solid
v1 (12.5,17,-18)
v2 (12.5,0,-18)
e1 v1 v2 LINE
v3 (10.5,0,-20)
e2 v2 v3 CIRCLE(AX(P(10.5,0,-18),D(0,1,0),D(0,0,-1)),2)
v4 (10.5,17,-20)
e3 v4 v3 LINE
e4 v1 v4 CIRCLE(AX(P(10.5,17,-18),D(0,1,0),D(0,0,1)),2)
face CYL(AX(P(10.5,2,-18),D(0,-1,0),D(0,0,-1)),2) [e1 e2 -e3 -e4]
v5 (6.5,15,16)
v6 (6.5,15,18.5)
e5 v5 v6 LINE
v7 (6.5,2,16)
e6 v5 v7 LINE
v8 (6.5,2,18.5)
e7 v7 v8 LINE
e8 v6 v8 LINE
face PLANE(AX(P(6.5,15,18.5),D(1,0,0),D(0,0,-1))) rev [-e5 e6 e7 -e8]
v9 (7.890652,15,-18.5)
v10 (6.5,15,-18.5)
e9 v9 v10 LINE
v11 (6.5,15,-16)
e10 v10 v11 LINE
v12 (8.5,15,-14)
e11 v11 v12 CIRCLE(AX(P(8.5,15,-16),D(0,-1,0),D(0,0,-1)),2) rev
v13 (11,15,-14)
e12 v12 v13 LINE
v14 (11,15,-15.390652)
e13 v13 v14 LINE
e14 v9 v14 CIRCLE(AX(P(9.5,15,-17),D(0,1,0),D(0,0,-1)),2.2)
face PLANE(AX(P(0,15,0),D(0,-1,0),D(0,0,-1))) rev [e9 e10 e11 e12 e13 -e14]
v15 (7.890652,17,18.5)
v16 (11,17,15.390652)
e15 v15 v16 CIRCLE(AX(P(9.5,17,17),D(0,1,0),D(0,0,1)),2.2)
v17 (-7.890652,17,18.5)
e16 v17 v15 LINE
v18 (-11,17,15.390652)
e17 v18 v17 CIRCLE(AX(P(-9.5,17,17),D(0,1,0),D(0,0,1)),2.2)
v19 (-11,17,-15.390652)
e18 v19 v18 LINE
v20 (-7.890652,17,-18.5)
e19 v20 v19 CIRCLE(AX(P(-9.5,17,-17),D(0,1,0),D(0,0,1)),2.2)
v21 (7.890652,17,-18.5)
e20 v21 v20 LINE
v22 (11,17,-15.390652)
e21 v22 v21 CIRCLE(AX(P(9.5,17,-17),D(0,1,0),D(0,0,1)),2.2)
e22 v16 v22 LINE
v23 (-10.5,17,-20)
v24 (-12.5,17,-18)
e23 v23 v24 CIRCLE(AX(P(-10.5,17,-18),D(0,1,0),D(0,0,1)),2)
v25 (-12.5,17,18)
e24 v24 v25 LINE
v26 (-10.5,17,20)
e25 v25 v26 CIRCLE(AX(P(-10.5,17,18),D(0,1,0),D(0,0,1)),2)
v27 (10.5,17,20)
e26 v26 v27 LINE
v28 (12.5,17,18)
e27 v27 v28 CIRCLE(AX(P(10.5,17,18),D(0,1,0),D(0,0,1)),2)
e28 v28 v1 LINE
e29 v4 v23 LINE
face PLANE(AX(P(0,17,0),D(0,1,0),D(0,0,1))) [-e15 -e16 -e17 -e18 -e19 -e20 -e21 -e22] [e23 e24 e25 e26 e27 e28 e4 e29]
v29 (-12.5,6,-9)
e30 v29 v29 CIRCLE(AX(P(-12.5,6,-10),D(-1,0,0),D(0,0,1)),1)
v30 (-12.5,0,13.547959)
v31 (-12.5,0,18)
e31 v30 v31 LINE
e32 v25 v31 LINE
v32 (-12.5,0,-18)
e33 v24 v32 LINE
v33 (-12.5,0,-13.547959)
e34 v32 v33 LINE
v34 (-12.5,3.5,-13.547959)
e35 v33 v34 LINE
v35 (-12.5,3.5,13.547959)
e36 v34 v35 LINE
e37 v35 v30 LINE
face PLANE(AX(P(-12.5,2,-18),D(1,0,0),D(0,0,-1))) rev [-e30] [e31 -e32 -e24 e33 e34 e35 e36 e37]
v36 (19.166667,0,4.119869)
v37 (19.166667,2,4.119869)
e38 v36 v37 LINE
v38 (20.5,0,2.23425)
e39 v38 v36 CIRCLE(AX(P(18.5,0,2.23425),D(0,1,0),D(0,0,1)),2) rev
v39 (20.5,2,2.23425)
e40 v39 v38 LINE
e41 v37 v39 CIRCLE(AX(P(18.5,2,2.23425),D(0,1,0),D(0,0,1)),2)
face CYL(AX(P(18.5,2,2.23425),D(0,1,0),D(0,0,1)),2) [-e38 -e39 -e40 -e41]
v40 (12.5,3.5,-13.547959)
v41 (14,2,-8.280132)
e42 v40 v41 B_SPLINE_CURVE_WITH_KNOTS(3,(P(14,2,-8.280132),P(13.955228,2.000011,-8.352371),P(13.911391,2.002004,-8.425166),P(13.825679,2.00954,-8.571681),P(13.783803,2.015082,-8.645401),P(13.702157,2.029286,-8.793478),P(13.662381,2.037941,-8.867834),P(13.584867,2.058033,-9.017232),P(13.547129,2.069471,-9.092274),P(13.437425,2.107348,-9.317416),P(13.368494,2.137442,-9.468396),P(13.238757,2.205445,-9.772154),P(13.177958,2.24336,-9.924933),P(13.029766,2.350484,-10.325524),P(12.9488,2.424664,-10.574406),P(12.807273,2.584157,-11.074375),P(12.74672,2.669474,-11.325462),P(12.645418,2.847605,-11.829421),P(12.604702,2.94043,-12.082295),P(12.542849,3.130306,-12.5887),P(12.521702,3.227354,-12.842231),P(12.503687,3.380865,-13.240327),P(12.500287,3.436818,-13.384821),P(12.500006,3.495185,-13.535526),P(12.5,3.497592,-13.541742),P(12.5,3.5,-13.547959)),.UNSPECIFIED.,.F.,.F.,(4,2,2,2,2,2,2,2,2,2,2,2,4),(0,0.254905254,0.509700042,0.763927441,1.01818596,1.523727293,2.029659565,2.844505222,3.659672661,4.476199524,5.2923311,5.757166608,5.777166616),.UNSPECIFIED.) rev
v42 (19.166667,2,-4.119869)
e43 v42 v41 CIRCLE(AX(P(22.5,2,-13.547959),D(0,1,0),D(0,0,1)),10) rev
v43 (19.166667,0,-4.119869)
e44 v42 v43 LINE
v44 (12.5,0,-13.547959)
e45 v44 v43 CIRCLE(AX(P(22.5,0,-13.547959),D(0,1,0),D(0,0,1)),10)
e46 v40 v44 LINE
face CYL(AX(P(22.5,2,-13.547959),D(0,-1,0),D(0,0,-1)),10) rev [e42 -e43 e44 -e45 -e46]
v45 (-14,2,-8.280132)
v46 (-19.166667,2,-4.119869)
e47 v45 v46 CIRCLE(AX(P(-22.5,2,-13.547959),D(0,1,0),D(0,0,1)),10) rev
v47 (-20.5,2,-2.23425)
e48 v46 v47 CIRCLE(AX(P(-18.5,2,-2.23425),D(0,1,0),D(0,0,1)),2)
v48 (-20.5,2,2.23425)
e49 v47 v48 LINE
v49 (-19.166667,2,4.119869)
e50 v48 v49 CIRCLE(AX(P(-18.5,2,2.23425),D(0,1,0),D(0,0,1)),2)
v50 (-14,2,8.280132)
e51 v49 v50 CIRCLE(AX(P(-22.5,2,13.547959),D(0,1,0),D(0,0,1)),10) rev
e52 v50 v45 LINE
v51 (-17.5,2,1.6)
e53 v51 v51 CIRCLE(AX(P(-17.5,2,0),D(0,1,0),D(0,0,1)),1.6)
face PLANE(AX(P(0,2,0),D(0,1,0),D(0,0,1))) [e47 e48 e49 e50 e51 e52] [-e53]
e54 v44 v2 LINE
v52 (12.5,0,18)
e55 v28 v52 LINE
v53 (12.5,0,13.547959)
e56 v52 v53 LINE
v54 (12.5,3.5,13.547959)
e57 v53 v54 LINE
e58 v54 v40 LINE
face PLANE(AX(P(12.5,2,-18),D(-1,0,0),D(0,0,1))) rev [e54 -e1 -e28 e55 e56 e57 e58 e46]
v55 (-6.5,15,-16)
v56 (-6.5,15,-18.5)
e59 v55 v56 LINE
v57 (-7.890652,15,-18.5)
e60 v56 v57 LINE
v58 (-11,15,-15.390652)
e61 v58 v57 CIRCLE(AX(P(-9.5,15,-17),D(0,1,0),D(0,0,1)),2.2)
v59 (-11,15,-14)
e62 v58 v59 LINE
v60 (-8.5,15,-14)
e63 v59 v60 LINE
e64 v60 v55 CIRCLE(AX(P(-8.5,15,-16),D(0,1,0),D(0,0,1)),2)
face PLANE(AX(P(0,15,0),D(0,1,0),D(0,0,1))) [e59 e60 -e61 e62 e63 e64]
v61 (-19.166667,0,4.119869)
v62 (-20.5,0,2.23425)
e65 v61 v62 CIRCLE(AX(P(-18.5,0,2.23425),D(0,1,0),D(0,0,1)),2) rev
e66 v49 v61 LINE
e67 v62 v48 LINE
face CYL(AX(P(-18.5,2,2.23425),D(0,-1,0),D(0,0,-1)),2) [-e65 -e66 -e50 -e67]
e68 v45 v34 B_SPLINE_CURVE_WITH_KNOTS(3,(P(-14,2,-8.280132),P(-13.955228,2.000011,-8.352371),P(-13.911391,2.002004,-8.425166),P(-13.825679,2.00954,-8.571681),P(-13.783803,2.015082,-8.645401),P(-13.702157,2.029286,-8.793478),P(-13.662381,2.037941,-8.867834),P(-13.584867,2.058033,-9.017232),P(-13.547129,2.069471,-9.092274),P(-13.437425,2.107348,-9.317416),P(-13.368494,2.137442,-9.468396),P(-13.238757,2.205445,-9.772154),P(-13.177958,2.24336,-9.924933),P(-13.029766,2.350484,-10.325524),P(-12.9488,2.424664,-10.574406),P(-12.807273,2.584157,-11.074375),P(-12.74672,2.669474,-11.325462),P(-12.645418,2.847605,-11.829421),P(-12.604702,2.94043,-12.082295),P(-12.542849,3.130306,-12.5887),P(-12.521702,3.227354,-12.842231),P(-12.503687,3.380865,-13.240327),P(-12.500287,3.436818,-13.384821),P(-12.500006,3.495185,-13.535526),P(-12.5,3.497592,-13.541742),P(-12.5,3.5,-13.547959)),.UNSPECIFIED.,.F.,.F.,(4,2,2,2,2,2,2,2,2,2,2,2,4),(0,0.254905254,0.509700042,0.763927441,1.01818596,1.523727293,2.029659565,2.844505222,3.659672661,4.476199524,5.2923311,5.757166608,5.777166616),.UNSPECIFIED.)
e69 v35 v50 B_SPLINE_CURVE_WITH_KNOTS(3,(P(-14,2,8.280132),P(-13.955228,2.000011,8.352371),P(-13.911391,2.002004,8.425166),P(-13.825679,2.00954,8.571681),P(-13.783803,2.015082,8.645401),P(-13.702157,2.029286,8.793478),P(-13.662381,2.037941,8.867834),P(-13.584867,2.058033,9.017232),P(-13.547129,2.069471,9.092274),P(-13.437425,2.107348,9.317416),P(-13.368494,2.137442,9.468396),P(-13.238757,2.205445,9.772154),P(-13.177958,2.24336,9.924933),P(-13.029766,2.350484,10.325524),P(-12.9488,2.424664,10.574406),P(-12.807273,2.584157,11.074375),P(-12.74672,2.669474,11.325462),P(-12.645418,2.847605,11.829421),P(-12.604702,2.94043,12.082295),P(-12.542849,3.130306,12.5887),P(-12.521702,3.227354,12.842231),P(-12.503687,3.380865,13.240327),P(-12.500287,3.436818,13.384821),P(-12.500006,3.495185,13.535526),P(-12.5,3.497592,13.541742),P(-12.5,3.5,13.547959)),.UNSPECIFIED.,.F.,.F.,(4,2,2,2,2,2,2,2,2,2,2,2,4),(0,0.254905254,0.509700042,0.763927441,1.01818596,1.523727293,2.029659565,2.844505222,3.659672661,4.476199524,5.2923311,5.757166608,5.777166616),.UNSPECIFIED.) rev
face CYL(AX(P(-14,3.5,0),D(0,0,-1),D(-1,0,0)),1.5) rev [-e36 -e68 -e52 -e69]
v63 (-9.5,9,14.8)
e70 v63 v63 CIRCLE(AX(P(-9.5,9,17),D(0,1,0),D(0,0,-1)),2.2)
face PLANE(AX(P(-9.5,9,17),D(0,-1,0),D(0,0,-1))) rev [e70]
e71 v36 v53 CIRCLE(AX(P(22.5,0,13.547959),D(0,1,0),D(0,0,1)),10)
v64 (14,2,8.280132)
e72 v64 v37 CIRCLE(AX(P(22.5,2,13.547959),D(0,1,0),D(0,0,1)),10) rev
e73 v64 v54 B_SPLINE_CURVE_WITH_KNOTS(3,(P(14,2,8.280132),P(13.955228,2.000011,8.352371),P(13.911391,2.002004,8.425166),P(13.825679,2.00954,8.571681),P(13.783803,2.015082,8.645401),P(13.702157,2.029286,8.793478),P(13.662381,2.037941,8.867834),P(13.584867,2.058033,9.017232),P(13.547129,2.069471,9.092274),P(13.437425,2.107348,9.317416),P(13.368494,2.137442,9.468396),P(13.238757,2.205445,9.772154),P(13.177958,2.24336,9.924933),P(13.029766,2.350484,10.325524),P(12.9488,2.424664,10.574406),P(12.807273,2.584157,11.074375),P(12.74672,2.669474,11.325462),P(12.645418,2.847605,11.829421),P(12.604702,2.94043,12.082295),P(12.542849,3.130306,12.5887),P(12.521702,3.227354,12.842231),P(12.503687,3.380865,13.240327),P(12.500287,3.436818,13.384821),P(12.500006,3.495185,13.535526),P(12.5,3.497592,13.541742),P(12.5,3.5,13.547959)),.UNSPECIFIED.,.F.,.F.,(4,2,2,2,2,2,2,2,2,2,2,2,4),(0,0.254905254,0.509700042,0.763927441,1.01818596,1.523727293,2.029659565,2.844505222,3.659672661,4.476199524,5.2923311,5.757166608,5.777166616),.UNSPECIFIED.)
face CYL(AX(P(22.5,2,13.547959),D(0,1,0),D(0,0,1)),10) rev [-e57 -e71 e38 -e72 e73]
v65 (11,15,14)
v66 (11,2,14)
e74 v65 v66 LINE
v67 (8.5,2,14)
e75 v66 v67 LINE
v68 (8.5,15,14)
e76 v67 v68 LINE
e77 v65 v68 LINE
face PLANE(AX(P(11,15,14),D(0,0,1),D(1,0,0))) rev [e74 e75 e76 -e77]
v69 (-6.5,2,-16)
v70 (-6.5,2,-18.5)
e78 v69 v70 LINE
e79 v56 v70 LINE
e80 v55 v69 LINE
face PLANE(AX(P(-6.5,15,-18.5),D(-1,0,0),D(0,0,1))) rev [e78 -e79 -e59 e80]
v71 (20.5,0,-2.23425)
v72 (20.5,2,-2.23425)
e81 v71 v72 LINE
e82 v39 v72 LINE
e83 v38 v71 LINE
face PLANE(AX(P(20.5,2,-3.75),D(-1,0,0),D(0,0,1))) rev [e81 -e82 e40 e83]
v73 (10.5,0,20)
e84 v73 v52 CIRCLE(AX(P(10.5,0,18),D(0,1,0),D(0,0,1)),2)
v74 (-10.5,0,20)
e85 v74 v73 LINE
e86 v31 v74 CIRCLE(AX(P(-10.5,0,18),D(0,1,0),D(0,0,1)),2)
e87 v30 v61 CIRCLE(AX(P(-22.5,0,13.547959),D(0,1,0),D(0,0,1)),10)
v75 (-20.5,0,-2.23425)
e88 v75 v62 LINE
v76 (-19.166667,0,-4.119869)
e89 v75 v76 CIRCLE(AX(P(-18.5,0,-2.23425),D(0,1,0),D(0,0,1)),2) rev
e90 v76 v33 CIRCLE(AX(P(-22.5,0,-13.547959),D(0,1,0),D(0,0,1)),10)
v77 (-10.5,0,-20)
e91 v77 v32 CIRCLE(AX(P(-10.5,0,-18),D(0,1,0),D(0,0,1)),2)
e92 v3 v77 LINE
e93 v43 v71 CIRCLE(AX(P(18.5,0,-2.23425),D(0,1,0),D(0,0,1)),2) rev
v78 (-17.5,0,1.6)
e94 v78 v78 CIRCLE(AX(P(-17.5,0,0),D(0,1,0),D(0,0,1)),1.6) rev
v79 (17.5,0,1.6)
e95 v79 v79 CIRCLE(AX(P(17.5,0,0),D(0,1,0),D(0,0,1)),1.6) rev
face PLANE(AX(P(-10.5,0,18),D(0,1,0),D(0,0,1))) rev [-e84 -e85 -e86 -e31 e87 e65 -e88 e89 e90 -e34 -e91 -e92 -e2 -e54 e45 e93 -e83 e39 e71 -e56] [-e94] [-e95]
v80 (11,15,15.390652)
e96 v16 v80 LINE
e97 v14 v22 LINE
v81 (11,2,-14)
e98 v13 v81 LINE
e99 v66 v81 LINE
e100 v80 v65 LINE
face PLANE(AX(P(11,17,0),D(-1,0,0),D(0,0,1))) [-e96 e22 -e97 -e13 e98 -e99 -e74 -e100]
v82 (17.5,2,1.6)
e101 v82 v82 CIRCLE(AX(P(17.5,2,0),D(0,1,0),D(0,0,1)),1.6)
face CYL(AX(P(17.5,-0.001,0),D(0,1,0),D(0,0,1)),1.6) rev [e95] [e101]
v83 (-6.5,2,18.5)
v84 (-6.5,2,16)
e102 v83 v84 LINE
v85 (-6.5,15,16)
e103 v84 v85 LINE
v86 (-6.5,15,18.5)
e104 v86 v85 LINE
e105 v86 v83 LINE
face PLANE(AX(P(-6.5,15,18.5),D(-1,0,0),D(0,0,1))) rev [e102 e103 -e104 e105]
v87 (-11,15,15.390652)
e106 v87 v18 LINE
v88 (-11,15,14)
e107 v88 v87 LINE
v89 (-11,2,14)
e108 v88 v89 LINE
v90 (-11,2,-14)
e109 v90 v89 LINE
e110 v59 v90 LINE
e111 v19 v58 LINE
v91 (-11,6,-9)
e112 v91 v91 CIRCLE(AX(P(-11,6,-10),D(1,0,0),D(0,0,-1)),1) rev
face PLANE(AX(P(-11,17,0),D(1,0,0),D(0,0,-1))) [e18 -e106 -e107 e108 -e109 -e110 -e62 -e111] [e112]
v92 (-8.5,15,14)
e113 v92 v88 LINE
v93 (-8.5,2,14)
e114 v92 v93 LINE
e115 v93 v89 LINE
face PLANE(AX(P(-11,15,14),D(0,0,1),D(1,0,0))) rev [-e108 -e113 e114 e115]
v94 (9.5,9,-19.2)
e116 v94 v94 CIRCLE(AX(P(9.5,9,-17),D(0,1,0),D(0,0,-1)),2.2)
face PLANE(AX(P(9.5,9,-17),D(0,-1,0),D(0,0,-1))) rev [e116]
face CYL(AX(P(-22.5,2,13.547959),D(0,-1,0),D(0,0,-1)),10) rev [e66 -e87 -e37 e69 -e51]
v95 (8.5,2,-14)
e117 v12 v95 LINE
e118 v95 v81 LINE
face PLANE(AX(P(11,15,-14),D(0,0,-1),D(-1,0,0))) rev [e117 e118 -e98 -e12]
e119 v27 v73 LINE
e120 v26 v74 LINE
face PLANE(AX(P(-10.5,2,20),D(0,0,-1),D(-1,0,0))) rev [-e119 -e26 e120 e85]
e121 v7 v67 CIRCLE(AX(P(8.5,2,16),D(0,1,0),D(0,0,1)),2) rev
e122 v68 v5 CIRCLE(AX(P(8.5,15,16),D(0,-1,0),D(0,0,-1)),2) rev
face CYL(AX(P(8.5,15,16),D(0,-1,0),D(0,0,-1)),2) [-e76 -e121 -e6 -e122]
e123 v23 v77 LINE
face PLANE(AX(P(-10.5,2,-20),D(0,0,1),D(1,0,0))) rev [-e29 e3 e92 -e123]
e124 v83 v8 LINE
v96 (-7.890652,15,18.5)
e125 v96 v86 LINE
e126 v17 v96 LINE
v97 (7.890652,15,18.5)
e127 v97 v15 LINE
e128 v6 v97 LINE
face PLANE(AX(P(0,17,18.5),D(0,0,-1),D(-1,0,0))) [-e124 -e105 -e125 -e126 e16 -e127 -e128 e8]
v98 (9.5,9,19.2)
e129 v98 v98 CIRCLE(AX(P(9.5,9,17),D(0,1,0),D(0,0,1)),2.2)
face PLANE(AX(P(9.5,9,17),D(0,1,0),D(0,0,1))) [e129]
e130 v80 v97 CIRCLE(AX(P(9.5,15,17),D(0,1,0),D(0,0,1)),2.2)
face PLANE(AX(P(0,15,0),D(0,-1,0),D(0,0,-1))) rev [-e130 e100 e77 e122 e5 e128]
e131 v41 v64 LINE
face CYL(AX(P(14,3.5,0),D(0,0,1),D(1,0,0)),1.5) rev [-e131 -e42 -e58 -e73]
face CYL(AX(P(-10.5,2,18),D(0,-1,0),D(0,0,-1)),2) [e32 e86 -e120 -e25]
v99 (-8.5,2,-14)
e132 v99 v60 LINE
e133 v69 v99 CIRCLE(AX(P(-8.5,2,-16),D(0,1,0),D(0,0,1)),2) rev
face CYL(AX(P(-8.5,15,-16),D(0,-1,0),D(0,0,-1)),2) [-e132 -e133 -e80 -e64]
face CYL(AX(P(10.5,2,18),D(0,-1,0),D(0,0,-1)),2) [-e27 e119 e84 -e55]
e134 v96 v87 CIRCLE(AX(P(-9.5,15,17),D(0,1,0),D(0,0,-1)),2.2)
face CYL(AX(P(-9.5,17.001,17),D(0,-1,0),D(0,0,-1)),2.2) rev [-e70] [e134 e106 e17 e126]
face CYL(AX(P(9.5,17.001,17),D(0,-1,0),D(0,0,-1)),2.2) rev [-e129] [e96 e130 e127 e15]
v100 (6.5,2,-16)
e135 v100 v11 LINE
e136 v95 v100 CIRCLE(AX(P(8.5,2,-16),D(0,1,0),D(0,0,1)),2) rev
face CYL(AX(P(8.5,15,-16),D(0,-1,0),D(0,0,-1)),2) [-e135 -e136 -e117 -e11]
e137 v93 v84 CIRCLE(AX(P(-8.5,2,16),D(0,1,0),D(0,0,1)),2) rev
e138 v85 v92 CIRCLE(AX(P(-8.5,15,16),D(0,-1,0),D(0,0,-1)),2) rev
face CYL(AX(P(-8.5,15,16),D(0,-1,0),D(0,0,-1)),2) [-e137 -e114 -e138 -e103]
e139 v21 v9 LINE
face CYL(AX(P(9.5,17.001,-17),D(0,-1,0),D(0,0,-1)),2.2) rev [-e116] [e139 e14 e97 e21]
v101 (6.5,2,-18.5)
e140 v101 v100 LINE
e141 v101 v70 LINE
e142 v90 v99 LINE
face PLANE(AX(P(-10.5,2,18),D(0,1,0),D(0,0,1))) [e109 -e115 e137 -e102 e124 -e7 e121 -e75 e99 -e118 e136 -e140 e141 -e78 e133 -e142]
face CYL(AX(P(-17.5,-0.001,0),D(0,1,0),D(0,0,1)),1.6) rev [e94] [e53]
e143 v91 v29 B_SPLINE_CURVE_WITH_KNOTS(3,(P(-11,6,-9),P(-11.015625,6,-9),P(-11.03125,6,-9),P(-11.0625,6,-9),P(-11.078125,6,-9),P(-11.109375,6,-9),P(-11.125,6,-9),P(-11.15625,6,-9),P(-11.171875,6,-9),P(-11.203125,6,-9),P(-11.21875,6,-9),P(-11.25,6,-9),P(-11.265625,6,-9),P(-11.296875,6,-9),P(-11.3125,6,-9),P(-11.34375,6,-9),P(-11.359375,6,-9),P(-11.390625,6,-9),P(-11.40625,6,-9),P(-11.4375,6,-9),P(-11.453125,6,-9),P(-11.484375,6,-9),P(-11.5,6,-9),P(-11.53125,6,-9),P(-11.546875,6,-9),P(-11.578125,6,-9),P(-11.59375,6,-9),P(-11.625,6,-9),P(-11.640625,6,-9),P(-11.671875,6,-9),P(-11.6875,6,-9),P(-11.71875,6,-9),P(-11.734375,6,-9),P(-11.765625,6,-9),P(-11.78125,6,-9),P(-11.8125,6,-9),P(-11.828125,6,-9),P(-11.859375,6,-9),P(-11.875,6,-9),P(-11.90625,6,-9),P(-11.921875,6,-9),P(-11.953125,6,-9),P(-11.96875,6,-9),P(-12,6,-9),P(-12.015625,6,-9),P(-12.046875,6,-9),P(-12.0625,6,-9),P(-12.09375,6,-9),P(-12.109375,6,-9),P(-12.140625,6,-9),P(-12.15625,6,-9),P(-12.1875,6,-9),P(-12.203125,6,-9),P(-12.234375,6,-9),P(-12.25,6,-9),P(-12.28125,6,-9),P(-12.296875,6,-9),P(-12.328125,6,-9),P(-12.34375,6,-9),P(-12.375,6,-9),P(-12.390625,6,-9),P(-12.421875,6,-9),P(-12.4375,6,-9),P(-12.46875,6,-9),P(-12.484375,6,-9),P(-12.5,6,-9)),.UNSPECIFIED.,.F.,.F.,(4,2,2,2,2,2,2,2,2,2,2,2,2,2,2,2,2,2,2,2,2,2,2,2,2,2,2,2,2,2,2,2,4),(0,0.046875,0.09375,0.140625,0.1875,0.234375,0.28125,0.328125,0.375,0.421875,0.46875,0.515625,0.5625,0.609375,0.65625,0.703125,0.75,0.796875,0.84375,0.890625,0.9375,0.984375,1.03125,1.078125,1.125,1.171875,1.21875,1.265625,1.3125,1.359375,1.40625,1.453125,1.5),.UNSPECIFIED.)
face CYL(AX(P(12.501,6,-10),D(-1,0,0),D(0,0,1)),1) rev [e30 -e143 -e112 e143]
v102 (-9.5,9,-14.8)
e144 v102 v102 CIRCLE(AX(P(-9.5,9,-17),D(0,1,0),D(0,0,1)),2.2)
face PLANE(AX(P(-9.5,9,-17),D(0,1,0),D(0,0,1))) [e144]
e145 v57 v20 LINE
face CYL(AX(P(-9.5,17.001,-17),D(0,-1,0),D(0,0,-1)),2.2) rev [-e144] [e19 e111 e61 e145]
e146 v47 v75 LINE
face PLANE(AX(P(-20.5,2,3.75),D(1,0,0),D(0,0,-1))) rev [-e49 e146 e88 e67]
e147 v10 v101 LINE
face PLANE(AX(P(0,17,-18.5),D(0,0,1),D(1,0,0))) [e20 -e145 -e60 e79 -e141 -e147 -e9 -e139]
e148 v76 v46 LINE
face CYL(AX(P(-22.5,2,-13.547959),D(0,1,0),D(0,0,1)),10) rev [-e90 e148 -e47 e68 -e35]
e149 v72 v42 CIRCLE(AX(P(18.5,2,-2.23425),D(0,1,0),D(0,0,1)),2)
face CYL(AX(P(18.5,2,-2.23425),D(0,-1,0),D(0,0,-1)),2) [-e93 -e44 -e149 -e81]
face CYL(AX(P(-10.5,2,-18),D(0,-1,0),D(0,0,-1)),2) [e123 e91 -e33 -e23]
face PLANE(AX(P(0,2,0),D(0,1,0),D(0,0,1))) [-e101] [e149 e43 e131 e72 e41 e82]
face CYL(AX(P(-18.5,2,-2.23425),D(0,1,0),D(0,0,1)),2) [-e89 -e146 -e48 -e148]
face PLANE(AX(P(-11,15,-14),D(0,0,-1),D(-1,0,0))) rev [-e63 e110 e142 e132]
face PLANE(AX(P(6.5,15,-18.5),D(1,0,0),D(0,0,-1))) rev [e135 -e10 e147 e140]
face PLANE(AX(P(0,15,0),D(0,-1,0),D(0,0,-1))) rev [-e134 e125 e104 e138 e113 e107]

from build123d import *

# Parameters (mm, degrees)
BASE_DEPTH                  = 2
MUR_DEPTH                   = 15
ESQUISSE3_W                 = 4.5
ESQUISSE3_H                 = 4.5
FIXATION_VIS_DEPTH          = 13
CONG_1_R                    = 2
ESQUISSE4_R                 = 2.2
INSERT_M3_DEPTH             = 6
INSERT_M3_DIRECTION_2_REACH = 29.951
PASSE_CABLE_REACH           = 38.249
ESQUISSE5_R                 = 1
ESQUISSE8_W                 = 8
ESQUISSE8_H                 = 7.5
PATES_FIXATION_DEPTH        = 2
PASSAGE_VIS_REACH           = 34.33
ESQUISSE9_R                 = 1.6
CONG_10MM_R                 = 10
CONG_2MM_R                  = 2
CONG_1_5MM_R                = 1.5


with BuildPart() as part:
    # Esquisse1 → Base (new body)
    with BuildSketch(Plane(origin=(0, 0, 0), x_dir=(1, 0, 0), z_dir=(0, 1, 0))):
        with BuildLine():
            Line((-10.5, 20), (10.5, 20))
            ThreePointArc((10.5, 20), (11.914213562, 19.414213562), (12.5, 18))
            Line((12.5, 18), (12.5, -18))
            ThreePointArc((12.5, -18), (11.914213562, -19.414213562), (10.5, -20))
            Line((10.5, -20), (-10.5, -20))
            ThreePointArc((-10.5, -20), (-11.914213562, -19.414213562), (-12.5, -18))
            Line((-12.5, -18), (-12.5, 18))
            ThreePointArc((-12.5, 18), (-11.914213562, 19.414213562), (-10.5, 20))
        make_face()
    extrude(amount=BASE_DEPTH)

    # Esquisse2 → Mur (add)
    with BuildSketch(Plane(origin=(0, 2, 0), x_dir=(1, 0, 0), z_dir=(0, 1, 0))):
        with BuildLine():
            Line((-12.5, 18), (-12.5, -18))
            ThreePointArc((-12.5, -18), (-11.914213562, -19.414213562), (-10.5, -20))
            Line((-10.5, -20), (10.5, -20))
            ThreePointArc((10.5, -20), (11.914213562, -19.414213562), (12.5, -18))
            Line((12.5, -18), (12.5, 18))
            ThreePointArc((12.5, 18), (11.914213562, 19.414213562), (10.5, 20))
            Line((10.5, 20), (-10.5, 20))
            ThreePointArc((-10.5, 20), (-11.914213562, 19.414213562), (-12.5, 18))
        make_face()
        with BuildLine():
            ThreePointArc((-10.5, 18.5), (-10.853553391, 18.353553391), (-11, 18))
            Line((-11, 18), (-11, -18))
            ThreePointArc((-11, -18), (-10.853553391, -18.353553391), (-10.5, -18.5))
            Line((-10.5, -18.5), (10.5, -18.5))
            ThreePointArc((10.5, -18.5), (10.853553391, -18.353553391), (11, -18))
            Line((11, -18), (11, 18))
            ThreePointArc((11, 18), (10.853553391, 18.353553391), (10.5, 18.5))
            Line((10.5, 18.5), (-10.5, 18.5))
        make_face(mode=Mode.SUBTRACT)
    extrude(amount=MUR_DEPTH)

    # Esquisse3 → Fixation Vis (add)
    with BuildSketch(Plane(origin=(0, 2, 0), x_dir=(1, 0, 0), z_dir=(0, 1, 0))):
        with Locations((-8.75, 16.25)):
            Rectangle(ESQUISSE3_W, ESQUISSE3_H)
        with Locations((8.75, 16.25)):
            Rectangle(ESQUISSE3_W, ESQUISSE3_H)
        with Locations((8.75, -16.25)):
            Rectangle(ESQUISSE3_W, ESQUISSE3_H)
        with Locations((-8.75, -16.25)):
            Rectangle(ESQUISSE3_W, ESQUISSE3_H)
    extrude(amount=FIXATION_VIS_DEPTH)

    # Congé1
    cong_1_edges = [part.edges().sort_by_distance(p)[0] for p in [
        (6.5, 8.5, 14),
        (-6.5, 8.5, 14),
        (-6.5, 8.5, -14),
        (6.5, 8.5, -14),
    ]]
    fillet(cong_1_edges, radius=CONG_1_R)

    # Esquisse4 → Insert M3 (cut)
    with BuildSketch(Plane(origin=(0, 15, 0), x_dir=(1, 0, 0), z_dir=(0, 1, 0))):
        with Locations(Location((-9.5, 17, 0), (0, 0, 42.98588608))):
            Circle(ESQUISSE4_R)
        with Locations(Location((9.5, 17, 0), (0, 0, 90))):
            Circle(ESQUISSE4_R)
        with Locations(Location((9.5, -17, 0), (0, 0, 47.01411392))):
            Circle(ESQUISSE4_R)
        with Locations(Location((-9.5, -17, 0), (0, 0, 90))):
            Circle(ESQUISSE4_R)
    extrude(amount=-INSERT_M3_DEPTH, mode=Mode.SUBTRACT)

    # Esquisse4 → Insert M3 direction 2 (cut, up to next)
    with BuildSketch(Plane(origin=(0, 15, 0), x_dir=(1, 0, 0), z_dir=(0, 1, 0)), mode=Mode.PRIVATE) as insert_m3_direction_2_sk1:
        with Locations(Location((-9.5, 17, 0), (0, 0, 42.98588608))):
            Circle(ESQUISSE4_R)
    insert_m3_direction_2_tool1 = extrude(insert_m3_direction_2_sk1.sketch, amount=INSERT_M3_DIRECTION_2_REACH, mode=Mode.PRIVATE) & part.part
    # Esquisse4 → Insert M3 direction 2 (cut, up to next)
    with BuildSketch(Plane(origin=(0, 15, 0), x_dir=(1, 0, 0), z_dir=(0, 1, 0)), mode=Mode.PRIVATE) as insert_m3_direction_2_sk2:
        with Locations(Location((9.5, 17, 0), (0, 0, 90))):
            Circle(ESQUISSE4_R)
    insert_m3_direction_2_tool2 = extrude(insert_m3_direction_2_sk2.sketch, amount=INSERT_M3_DIRECTION_2_REACH, mode=Mode.PRIVATE) & part.part
    # Esquisse4 → Insert M3 direction 2 (cut, up to next)
    with BuildSketch(Plane(origin=(0, 15, 0), x_dir=(1, 0, 0), z_dir=(0, 1, 0)), mode=Mode.PRIVATE) as insert_m3_direction_2_sk3:
        with Locations(Location((9.5, -17, 0), (0, 0, 47.01411392))):
            Circle(ESQUISSE4_R)
    insert_m3_direction_2_tool3 = extrude(insert_m3_direction_2_sk3.sketch, amount=INSERT_M3_DIRECTION_2_REACH, mode=Mode.PRIVATE) & part.part
    # Esquisse4 → Insert M3 direction 2 (cut, up to next)
    with BuildSketch(Plane(origin=(0, 15, 0), x_dir=(1, 0, 0), z_dir=(0, 1, 0)), mode=Mode.PRIVATE) as insert_m3_direction_2_sk4:
        with Locations(Location((-9.5, -17, 0), (0, 0, 90))):
            Circle(ESQUISSE4_R)
    insert_m3_direction_2_tool4 = extrude(insert_m3_direction_2_sk4.sketch, amount=INSERT_M3_DIRECTION_2_REACH, mode=Mode.PRIVATE) & part.part
    add(insert_m3_direction_2_tool1.solids().sort_by_distance((-9.5, 15, -17))[0], mode=Mode.SUBTRACT)
    add(insert_m3_direction_2_tool2.solids().sort_by_distance((9.5, 15, -17))[0], mode=Mode.SUBTRACT)
    add(insert_m3_direction_2_tool3.solids().sort_by_distance((9.5, 15, 17))[0], mode=Mode.SUBTRACT)
    add(insert_m3_direction_2_tool4.solids().sort_by_distance((-9.5, 15, 17))[0], mode=Mode.SUBTRACT)

    # Esquisse5 → Passe-Cable (cut, up to next)
    with BuildSketch(Plane.ZY.offset(12.5), mode=Mode.PRIVATE) as passe_cable_sk1:
        with Locations((-10, 6)):
            Circle(ESQUISSE5_R)
    passe_cable_tool1 = extrude(passe_cable_sk1.sketch, amount=-PASSE_CABLE_REACH, mode=Mode.PRIVATE) & part.part
    add(passe_cable_tool1.solids().sort_by_distance((-12.5, 6, -10))[0], mode=Mode.SUBTRACT)

    # Esquisse8 → Pates fixation (add)
    with BuildSketch(Plane(origin=(0, 0, 0), x_dir=(1, 0, 0), z_dir=(0, 1, 0))):
        with Locations((16.5, 0)):
            Rectangle(ESQUISSE8_W, ESQUISSE8_H)
        with Locations((-16.5, 0)):
            Rectangle(ESQUISSE8_W, ESQUISSE8_H)
    extrude(amount=PATES_FIXATION_DEPTH)

    # Esquisse9 → Passage_Vis (cut, up to next)
    with BuildSketch(Plane(origin=(0, 2, 0), x_dir=(1, 0, 0), z_dir=(0, 1, 0)), mode=Mode.PRIVATE) as passage_vis_sk1:
        with Locations(Location((-17.5, 0, 0), (0, 0, 270))):
            Circle(ESQUISSE9_R)
    passage_vis_tool1 = extrude(passage_vis_sk1.sketch, amount=-PASSAGE_VIS_REACH, mode=Mode.PRIVATE) & part.part
    # Esquisse9 → Passage_Vis (cut, up to next)
    with BuildSketch(Plane(origin=(0, 2, 0), x_dir=(1, 0, 0), z_dir=(0, 1, 0)), mode=Mode.PRIVATE) as passage_vis_sk2:
        with Locations(Location((17.5, 0, 0), (0, 0, 270))):
            Circle(ESQUISSE9_R)
    passage_vis_tool2 = extrude(passage_vis_sk2.sketch, amount=-PASSAGE_VIS_REACH, mode=Mode.PRIVATE) & part.part
    add(passage_vis_tool1.solids().sort_by_distance((-17.5, 2, 0))[0], mode=Mode.SUBTRACT)
    add(passage_vis_tool2.solids().sort_by_distance((17.5, 2, 0))[0], mode=Mode.SUBTRACT)

    # Congé_10mm
    # the kernel refuses this fillet: 10 mm, written as the material it adds along each edge
    with BuildSketch(Plane(origin=(12.5, 0, 3.75), x_dir=(0, 0, 1), z_dir=(0, 1, 0)), Plane(origin=(-12.5, 0, -3.75), x_dir=(0, 0, -1), z_dir=(0, 1, 0))) as cong_10mm_piece_1:
        with BuildLine():
            CenterArc((9.797958971, 10), CONG_10MM_R, 191.536959033, 78.463040967)
            Line((0, 8), (-0.195959179, 7.96))
            ThreePointArc((-0.195959179, 7.96), (-0.2, 4), (-0.2, 0))
            Line((-0.2, 0), (0, -0.2))
            Line((0, -0.2), (9.797958971, -0.2))
            Line((9.797958971, -0.2), (9.797958971, 0))
        make_face()
    extrude(amount=2)
    with BuildSketch(Plane(origin=(12.5, 0, -3.75), x_dir=(0, 0, -1), z_dir=(0, 1, 0)), Plane(origin=(-12.5, 0, 3.75), x_dir=(0, 0, 1), z_dir=(0, 1, 0))) as cong_10mm_piece_2:
        with BuildLine():
            CenterArc((9.797958971, -10), CONG_10MM_R, 90, 78.463040967)
            Line((0, -8), (-0.195959179, -7.96))
            ThreePointArc((-0.195959179, -7.96), (-0.2, -4), (-0.2, 0))
            Line((-0.2, 0), (0, 0.2))
            Line((0, 0.2), (9.797958971, 0.2))
            Line((9.797958971, 0.2), (9.797958971, 0))
        make_face()
    extrude(amount=2)

    # Congé_2mm
    # the kernel refuses this fillet: 2 mm, written as the material it takes off along each edge
    with BuildSketch(Plane(origin=(20.5, -3.78937382, 3.75), x_dir=(-0.9636113749942804, 0, 0.26730716036356444), z_dir=(0, 1, 0)), Plane(origin=(-20.5, -3.78937382, -3.75), x_dir=(0.9636113749942804, 0, -0.26730716036356456), z_dir=(0, 1, 0))) as cong_2mm_piece_1:
        with BuildLine():
            CenterArc((1.522052048, -1.995207807), CONG_2MM_R, 93.967130801, 70.528779366)
            Line((-0.405170702, -1.460593487), (0, 0))
            ThreePointArc((0, 0), (0.69184184, -0.023960963), (1.38368368, 0))
        make_face()
    extrude(amount=9.578747639, mode=Mode.SUBTRACT)
    with BuildSketch(Plane(origin=(20.5, -3.78937382, -3.75), x_dir=(-0.9636113749942801, 0, -0.2673071603635657), z_dir=(0, 1, 0))) as cong_2mm_piece_2:
        with BuildLine():
            CenterArc((1.522052048, 1.995207807), CONG_2MM_R, 195.504089834, 70.528779366)
            Line((-0.405170702, 1.460593487), (0, 0))
            ThreePointArc((0, 0), (0.69184184, 0.023960963), (1.38368368, 0))
        make_face()
    extrude(amount=9.578747639, mode=Mode.SUBTRACT)
    with BuildSketch(Plane(origin=(-20.5, -3.78937382, 3.75), x_dir=(0, 0, -1), z_dir=(0, 1, 0))) as cong_2mm_piece_3:
        with BuildLine():
            CenterArc((1.515749528, -2), CONG_2MM_R, 90, 70.528779366)
            ThreePointArc((-0.369868555, -1.333333333), (-0.161845221, -0.673071604), (0, 0))
            Line((0, 0), (1.515749528, 0))
        make_face()
    extrude(amount=9.578747639, mode=Mode.SUBTRACT)

    # Congé_1,5mm
    cong_1_5mm_edges = [part.edges().sort_by_distance(p)[0] for p in [
        (12.5, 2, 0),
        (-12.5, 2, 0),
    ]]
    fillet(cong_1_5mm_edges, radius=CONG_1_5MM_R)


solid = part.part
